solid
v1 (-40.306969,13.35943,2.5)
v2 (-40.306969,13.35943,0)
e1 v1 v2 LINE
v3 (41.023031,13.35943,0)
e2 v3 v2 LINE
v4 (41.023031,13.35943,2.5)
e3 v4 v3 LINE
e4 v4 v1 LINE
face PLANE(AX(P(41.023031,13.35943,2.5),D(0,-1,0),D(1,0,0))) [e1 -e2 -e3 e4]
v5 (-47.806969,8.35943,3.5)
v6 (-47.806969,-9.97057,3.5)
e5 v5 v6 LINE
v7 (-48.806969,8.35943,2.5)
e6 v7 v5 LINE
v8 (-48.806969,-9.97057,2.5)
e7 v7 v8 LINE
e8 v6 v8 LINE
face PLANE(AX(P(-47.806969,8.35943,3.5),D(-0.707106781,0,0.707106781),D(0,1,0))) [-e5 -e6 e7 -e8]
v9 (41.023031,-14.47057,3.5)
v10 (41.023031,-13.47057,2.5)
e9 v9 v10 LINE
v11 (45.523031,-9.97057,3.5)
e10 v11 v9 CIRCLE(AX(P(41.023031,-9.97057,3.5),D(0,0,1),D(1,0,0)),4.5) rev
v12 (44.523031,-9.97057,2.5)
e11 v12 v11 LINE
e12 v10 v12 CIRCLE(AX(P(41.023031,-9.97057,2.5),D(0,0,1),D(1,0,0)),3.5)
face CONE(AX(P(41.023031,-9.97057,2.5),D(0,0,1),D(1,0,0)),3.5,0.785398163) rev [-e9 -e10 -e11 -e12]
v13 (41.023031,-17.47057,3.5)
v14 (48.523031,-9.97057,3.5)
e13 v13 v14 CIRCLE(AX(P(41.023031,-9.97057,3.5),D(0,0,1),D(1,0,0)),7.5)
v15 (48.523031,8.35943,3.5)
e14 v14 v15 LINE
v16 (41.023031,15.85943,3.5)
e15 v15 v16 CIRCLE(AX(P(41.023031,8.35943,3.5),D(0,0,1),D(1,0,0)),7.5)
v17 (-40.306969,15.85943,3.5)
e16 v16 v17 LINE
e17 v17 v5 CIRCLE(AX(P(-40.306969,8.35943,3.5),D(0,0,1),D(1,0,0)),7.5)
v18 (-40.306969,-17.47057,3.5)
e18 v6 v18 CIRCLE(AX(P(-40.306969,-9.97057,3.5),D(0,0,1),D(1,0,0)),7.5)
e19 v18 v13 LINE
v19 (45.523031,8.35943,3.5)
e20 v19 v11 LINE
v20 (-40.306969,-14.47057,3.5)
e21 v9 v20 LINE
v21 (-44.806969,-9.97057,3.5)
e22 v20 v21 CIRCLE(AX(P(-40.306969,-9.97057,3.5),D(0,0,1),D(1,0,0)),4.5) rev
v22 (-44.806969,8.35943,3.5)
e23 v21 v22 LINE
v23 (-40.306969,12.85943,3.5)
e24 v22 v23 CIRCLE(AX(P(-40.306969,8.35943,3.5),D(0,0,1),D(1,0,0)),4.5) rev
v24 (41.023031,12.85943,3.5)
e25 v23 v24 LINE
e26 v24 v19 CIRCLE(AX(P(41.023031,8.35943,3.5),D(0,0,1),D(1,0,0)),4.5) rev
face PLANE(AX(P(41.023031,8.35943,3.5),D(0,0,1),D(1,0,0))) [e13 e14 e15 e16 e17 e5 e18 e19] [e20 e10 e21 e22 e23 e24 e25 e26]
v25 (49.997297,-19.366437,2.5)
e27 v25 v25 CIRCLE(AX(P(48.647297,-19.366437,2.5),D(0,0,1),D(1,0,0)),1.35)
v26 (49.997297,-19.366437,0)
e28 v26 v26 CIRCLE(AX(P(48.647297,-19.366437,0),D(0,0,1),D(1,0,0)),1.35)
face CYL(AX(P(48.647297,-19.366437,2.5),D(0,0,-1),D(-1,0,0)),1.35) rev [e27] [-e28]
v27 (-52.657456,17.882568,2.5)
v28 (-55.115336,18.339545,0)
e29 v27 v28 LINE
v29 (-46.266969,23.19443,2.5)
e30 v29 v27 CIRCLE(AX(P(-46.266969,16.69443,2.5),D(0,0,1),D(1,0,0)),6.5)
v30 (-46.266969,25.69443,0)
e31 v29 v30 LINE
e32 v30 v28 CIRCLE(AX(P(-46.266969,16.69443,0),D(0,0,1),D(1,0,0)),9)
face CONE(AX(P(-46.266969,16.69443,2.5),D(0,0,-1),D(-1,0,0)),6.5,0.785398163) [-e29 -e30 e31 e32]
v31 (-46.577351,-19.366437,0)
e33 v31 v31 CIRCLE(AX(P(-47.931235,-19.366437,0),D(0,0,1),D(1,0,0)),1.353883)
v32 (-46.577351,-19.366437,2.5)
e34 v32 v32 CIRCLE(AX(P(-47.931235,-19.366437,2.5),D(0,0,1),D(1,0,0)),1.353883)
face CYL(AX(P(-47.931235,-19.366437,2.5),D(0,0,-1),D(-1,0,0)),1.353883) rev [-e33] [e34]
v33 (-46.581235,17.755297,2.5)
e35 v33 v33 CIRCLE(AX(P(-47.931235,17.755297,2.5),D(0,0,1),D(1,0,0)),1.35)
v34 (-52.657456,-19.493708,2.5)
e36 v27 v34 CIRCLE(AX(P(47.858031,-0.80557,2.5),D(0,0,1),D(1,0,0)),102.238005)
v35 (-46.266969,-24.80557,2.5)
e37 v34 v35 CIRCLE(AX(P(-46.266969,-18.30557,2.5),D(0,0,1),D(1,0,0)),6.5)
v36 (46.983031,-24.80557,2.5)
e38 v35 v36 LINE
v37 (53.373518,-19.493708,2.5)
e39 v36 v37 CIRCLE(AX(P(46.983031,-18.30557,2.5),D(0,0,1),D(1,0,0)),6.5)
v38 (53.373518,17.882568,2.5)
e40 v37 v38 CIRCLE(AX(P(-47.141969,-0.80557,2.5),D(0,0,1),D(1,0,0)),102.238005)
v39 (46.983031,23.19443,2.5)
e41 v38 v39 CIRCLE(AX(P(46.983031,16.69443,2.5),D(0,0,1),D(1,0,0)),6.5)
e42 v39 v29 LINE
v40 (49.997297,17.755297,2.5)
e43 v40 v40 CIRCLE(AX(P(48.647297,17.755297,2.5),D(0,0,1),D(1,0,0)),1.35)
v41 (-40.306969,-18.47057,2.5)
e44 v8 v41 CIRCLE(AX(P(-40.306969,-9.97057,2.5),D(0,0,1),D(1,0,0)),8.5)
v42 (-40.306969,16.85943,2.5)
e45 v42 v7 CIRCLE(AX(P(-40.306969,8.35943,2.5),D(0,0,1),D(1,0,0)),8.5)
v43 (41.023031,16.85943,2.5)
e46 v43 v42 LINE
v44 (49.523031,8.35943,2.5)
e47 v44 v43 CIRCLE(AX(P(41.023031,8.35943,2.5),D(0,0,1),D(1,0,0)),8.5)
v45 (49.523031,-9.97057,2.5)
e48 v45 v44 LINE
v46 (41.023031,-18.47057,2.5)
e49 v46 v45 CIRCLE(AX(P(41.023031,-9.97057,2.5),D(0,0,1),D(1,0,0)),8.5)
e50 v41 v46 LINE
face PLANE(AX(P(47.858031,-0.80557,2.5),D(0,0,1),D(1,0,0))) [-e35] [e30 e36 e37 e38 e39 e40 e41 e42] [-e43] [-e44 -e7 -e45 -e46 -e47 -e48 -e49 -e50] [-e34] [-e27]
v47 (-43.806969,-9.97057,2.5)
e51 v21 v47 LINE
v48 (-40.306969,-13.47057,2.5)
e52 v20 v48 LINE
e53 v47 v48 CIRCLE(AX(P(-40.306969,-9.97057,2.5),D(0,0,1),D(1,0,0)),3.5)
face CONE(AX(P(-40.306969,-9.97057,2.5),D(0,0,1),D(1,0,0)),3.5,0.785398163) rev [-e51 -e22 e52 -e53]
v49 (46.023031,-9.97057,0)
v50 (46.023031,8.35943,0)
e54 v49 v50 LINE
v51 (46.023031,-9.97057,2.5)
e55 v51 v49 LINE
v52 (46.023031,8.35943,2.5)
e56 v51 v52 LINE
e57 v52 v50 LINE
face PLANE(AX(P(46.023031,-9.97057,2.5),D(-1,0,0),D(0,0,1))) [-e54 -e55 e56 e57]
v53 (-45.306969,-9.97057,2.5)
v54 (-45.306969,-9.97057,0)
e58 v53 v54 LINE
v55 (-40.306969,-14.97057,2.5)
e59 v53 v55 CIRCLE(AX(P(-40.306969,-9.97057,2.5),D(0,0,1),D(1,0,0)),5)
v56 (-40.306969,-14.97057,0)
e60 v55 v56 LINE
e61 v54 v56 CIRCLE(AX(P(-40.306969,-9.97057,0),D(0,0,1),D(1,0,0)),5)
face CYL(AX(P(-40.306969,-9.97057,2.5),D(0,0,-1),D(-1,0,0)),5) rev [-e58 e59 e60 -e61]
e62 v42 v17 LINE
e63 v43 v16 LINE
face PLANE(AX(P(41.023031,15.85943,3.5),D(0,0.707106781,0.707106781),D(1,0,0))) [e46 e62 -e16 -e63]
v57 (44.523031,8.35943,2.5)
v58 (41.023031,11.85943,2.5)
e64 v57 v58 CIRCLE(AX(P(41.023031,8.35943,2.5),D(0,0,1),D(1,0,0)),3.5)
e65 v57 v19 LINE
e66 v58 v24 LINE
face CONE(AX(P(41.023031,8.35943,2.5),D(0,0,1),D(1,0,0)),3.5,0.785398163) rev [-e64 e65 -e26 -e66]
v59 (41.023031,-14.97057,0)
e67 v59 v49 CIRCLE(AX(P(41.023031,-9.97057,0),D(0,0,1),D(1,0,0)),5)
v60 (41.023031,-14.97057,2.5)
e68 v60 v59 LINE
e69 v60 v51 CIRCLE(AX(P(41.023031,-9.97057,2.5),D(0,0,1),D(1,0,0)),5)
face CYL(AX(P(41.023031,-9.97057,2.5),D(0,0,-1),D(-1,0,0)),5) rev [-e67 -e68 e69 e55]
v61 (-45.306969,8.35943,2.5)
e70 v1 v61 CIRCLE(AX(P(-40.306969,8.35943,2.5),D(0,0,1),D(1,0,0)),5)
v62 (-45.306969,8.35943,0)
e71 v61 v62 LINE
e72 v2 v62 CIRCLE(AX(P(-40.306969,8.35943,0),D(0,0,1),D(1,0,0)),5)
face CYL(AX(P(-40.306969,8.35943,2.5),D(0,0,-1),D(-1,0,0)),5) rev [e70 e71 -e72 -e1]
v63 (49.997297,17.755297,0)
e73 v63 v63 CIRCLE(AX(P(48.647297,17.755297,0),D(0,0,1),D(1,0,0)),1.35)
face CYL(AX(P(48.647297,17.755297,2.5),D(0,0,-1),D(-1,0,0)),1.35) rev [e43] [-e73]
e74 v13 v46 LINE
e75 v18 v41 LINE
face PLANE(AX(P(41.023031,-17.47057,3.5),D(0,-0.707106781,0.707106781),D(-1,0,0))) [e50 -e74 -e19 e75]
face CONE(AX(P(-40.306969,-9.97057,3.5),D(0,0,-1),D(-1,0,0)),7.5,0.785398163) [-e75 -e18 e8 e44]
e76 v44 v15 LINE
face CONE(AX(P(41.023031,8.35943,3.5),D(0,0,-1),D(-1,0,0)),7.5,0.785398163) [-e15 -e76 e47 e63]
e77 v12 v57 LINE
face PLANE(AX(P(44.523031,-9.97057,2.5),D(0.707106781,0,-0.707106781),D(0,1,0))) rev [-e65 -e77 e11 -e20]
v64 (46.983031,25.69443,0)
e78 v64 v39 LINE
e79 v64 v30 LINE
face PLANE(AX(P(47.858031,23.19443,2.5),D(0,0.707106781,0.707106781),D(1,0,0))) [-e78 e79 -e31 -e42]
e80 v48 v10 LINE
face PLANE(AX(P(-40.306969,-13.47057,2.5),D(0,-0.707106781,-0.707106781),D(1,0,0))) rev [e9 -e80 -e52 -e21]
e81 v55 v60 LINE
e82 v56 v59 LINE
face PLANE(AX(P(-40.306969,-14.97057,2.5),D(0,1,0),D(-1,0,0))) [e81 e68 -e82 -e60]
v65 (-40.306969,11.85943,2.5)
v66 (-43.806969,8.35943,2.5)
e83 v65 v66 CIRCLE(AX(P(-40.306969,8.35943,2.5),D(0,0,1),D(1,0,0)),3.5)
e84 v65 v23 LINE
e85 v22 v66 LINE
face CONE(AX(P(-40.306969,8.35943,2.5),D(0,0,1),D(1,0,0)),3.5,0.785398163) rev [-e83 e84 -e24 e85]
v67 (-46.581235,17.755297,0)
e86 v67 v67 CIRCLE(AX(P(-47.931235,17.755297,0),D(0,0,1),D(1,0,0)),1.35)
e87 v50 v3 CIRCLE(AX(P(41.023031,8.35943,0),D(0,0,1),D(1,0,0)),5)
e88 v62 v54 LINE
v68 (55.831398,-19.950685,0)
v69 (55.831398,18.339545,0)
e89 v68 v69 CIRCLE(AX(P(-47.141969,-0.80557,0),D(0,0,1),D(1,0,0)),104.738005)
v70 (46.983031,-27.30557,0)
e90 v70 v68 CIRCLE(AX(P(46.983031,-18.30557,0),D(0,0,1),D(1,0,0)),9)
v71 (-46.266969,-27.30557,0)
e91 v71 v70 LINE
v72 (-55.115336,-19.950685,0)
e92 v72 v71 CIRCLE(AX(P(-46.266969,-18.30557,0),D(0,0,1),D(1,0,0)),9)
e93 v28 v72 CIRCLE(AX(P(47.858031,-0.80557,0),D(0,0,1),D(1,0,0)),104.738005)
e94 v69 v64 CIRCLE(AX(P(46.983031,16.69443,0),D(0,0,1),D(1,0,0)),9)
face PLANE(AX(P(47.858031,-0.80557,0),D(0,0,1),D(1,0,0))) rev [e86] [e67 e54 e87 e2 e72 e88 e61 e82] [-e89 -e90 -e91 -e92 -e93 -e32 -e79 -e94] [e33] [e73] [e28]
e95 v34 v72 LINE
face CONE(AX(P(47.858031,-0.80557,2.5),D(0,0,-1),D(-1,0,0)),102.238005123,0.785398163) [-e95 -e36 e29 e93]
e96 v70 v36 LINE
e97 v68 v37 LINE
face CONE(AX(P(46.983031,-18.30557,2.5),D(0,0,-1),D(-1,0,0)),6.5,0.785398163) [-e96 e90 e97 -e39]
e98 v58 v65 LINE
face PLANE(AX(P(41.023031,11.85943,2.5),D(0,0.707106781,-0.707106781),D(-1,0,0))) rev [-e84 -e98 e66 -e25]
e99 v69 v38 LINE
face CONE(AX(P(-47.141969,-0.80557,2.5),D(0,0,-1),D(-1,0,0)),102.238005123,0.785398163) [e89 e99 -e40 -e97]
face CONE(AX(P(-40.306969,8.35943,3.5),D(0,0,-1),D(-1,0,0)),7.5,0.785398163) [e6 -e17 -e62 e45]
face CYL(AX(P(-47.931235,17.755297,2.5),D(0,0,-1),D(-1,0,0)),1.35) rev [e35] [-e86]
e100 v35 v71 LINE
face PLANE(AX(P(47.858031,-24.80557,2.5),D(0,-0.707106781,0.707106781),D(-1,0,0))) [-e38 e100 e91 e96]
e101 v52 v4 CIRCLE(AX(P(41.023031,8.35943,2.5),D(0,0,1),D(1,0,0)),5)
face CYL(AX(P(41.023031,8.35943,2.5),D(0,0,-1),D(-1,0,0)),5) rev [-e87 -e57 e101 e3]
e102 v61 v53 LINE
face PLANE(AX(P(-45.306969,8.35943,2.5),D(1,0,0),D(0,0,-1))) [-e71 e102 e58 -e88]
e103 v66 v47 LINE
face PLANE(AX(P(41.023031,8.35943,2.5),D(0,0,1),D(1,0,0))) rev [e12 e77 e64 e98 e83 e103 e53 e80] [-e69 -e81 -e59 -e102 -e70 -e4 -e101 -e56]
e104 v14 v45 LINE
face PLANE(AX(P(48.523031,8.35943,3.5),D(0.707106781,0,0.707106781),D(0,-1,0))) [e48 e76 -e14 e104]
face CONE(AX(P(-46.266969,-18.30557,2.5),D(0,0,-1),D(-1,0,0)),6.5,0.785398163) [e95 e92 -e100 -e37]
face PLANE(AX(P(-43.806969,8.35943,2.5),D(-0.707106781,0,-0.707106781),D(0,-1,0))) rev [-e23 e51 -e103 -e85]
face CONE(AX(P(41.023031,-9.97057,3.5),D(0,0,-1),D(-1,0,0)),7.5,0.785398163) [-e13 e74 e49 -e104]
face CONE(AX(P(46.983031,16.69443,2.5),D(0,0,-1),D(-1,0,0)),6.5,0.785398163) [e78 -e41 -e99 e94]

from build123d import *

# Parameters (mm, degrees)
SKETCH1_R           = 1.35
SKETCH1_R_2         = 1.353883359
BOSS_EXTRUDE1_DEPTH = 2.5
BOSS_EXTRUDE2_DEPTH = 1
CHAMFER1_SIZE       = 1
CHAMFER2_SIZE       = 2.5


with BuildPart() as part:
    # Sketch1 → Boss-Extrude1 (new body)
    with BuildSketch(Plane.XY):
        with BuildLine():
            Line((-46.266968928, -27.305569911), (46.983031072, -27.305569911))
            ThreePointArc((46.983031072, -27.305569911), (52.736028884, -25.226770397), (55.831398017, -19.950684615))
            ThreePointArc((55.831398017, -19.950684615), (57.596036195, -0.805569911), (55.831398017, 18.339544793))
            ThreePointArc((55.831398017, 18.339544793), (52.736028884, 23.615630575), (46.983031072, 25.694430089))
            Line((46.983031072, 25.694430089), (-46.266968928, 25.694430089))
            ThreePointArc((-46.266968928, 25.694430089), (-52.019966741, 23.615630575), (-55.115335874, 18.339544793))
            ThreePointArc((-55.115335874, 18.339544793), (-56.879974052, -0.805569911), (-55.115335874, -19.950684615))
            ThreePointArc((-55.115335874, -19.950684615), (-52.019966741, -25.226770397), (-46.266968928, -27.305569911))
        make_face()
        with Locations((48.647296931, -19.366437107)):
            Circle(SKETCH1_R, mode=Mode.SUBTRACT)
        with Locations((48.647296931, 17.755297285)):
            Circle(SKETCH1_R, mode=Mode.SUBTRACT)
        with Locations((-47.931234788, 17.755297285)):
            Circle(SKETCH1_R, mode=Mode.SUBTRACT)
        with Locations((-47.931234788, -19.366437107)):
            Circle(SKETCH1_R_2, mode=Mode.SUBTRACT)
        with BuildLine():
            Line((-40.306968928, -14.970569911), (41.023031072, -14.970569911))
            ThreePointArc((41.023031072, -14.970569911), (44.558564977, -13.506103817), (46.023031072, -9.970569911))
            Line((46.023031072, -9.970569911), (46.023031072, 8.359430089))
            ThreePointArc((46.023031072, 8.359430089), (44.558564977, 11.894963995), (41.023031072, 13.359430089))
            Line((41.023031072, 13.359430089), (-40.306968928, 13.359430089))
            ThreePointArc((-40.306968928, 13.359430089), (-43.842502834, 11.894963995), (-45.306968928, 8.359430089))
            Line((-45.306968928, 8.359430089), (-45.306968928, -9.970569911))
            ThreePointArc((-45.306968928, -9.970569911), (-43.842502834, -13.506103817), (-40.306968928, -14.970569911))
        make_face(mode=Mode.SUBTRACT)
    extrude(amount=BOSS_EXTRUDE1_DEPTH)

    # Sketch2 → Boss-Extrude2 (add)
    with BuildSketch(Plane.XY.offset(2.5)):
        with BuildLine():
            Line((49.523031072, -9.970569911), (49.523031072, 8.359430089))
            ThreePointArc((49.523031072, 8.359430089), (47.033438712, 14.369837729), (41.023031072, 16.859430089))
            Line((41.023031072, 16.859430089), (-40.306968928, 16.859430089))
            ThreePointArc((-40.306968928, 16.859430089), (-46.317376569, 14.369837729), (-48.806968928, 8.359430089))
            Line((-48.806968928, 8.359430089), (-48.806968928, -9.970569911))
            ThreePointArc((-48.806968928, -9.970569911), (-46.317376569, -15.980977551), (-40.306968928, -18.470569911))
            Line((-40.306968928, -18.470569911), (41.023031072, -18.470569911))
            ThreePointArc((41.023031072, -18.470569911), (47.033438712, -15.980977551), (49.523031072, -9.970569911))
        make_face()
        with BuildLine():
            Line((41.023031072, 11.859430089), (-40.306968928, 11.859430089))
            ThreePointArc((-40.306968928, 11.859430089), (-42.781842663, 10.834303823), (-43.806968928, 8.359430089))
            Line((-43.806968928, 8.359430089), (-43.806968928, -9.970569911))
            ThreePointArc((-43.806968928, -9.970569911), (-42.781842663, -12.445443645), (-40.306968928, -13.470569911))
            Line((-40.306968928, -13.470569911), (41.023031072, -13.470569911))
            ThreePointArc((41.023031072, -13.470569911), (43.497904806, -12.445443645), (44.523031072, -9.970569911))
            Line((44.523031072, -9.970569911), (44.523031072, 8.359430089))
            ThreePointArc((44.523031072, 8.359430089), (43.497904806, 10.834303823), (41.023031072, 11.859430089))
        make_face(mode=Mode.SUBTRACT)
    extrude(amount=BOSS_EXTRUDE2_DEPTH)

    # Chamfer1
    chamfer1_edges = [part.edges().sort_by_distance(p)[0] for p in [
        (-42.781842663, 10.834303823, 3.5),
        (-43.806968928, -0.805569911, 3.5),
        (-42.781842663, -12.445443645, 3.5),
        (0.358031072, -13.470569911, 3.5),
        (43.497904806, -12.445443645, 3.5),
        (44.523031072, -0.805569911, 3.5),
        (43.497904806, 10.834303823, 3.5),
        (0.358031072, 11.859430089, 3.5),
        (49.523031072, -0.805569911, 3.5),
        (47.033438712, -15.980977551, 3.5),
        (0.358031072, -18.470569911, 3.5),
        (-46.317376569, -15.980977551, 3.5),
        (-48.806968928, -0.805569911, 3.5),
        (-46.317376569, 14.369837729, 3.5),
        (0.358031072, 16.859430089, 3.5),
        (47.033438712, 14.369837729, 3.5),
    ]]
    chamfer(chamfer1_edges, length=CHAMFER1_SIZE - 0.0001)  # a hair under: the kernel refuses the full size

    # Chamfer2
    chamfer2_edges = [part.edges().sort_by_distance(p)[0] for p in [
        (0.358031072, -27.305569911, 2.5),
        (52.736028884, -25.226770397, 2.5),
        (-52.019966741, -25.226770397, 2.5),
        (57.596036195, -0.805569911, 2.5),
        (-56.879974052, -0.805569911, 2.5),
        (52.736028884, 23.615630575, 2.5),
        (-52.019966741, 23.615630575, 2.5),
        (0.358031072, 25.694430089, 2.5),
    ]]
    chamfer(chamfer2_edges, length=CHAMFER2_SIZE - 0.0001)  # a hair under: the kernel refuses the full size


solid = part.part
